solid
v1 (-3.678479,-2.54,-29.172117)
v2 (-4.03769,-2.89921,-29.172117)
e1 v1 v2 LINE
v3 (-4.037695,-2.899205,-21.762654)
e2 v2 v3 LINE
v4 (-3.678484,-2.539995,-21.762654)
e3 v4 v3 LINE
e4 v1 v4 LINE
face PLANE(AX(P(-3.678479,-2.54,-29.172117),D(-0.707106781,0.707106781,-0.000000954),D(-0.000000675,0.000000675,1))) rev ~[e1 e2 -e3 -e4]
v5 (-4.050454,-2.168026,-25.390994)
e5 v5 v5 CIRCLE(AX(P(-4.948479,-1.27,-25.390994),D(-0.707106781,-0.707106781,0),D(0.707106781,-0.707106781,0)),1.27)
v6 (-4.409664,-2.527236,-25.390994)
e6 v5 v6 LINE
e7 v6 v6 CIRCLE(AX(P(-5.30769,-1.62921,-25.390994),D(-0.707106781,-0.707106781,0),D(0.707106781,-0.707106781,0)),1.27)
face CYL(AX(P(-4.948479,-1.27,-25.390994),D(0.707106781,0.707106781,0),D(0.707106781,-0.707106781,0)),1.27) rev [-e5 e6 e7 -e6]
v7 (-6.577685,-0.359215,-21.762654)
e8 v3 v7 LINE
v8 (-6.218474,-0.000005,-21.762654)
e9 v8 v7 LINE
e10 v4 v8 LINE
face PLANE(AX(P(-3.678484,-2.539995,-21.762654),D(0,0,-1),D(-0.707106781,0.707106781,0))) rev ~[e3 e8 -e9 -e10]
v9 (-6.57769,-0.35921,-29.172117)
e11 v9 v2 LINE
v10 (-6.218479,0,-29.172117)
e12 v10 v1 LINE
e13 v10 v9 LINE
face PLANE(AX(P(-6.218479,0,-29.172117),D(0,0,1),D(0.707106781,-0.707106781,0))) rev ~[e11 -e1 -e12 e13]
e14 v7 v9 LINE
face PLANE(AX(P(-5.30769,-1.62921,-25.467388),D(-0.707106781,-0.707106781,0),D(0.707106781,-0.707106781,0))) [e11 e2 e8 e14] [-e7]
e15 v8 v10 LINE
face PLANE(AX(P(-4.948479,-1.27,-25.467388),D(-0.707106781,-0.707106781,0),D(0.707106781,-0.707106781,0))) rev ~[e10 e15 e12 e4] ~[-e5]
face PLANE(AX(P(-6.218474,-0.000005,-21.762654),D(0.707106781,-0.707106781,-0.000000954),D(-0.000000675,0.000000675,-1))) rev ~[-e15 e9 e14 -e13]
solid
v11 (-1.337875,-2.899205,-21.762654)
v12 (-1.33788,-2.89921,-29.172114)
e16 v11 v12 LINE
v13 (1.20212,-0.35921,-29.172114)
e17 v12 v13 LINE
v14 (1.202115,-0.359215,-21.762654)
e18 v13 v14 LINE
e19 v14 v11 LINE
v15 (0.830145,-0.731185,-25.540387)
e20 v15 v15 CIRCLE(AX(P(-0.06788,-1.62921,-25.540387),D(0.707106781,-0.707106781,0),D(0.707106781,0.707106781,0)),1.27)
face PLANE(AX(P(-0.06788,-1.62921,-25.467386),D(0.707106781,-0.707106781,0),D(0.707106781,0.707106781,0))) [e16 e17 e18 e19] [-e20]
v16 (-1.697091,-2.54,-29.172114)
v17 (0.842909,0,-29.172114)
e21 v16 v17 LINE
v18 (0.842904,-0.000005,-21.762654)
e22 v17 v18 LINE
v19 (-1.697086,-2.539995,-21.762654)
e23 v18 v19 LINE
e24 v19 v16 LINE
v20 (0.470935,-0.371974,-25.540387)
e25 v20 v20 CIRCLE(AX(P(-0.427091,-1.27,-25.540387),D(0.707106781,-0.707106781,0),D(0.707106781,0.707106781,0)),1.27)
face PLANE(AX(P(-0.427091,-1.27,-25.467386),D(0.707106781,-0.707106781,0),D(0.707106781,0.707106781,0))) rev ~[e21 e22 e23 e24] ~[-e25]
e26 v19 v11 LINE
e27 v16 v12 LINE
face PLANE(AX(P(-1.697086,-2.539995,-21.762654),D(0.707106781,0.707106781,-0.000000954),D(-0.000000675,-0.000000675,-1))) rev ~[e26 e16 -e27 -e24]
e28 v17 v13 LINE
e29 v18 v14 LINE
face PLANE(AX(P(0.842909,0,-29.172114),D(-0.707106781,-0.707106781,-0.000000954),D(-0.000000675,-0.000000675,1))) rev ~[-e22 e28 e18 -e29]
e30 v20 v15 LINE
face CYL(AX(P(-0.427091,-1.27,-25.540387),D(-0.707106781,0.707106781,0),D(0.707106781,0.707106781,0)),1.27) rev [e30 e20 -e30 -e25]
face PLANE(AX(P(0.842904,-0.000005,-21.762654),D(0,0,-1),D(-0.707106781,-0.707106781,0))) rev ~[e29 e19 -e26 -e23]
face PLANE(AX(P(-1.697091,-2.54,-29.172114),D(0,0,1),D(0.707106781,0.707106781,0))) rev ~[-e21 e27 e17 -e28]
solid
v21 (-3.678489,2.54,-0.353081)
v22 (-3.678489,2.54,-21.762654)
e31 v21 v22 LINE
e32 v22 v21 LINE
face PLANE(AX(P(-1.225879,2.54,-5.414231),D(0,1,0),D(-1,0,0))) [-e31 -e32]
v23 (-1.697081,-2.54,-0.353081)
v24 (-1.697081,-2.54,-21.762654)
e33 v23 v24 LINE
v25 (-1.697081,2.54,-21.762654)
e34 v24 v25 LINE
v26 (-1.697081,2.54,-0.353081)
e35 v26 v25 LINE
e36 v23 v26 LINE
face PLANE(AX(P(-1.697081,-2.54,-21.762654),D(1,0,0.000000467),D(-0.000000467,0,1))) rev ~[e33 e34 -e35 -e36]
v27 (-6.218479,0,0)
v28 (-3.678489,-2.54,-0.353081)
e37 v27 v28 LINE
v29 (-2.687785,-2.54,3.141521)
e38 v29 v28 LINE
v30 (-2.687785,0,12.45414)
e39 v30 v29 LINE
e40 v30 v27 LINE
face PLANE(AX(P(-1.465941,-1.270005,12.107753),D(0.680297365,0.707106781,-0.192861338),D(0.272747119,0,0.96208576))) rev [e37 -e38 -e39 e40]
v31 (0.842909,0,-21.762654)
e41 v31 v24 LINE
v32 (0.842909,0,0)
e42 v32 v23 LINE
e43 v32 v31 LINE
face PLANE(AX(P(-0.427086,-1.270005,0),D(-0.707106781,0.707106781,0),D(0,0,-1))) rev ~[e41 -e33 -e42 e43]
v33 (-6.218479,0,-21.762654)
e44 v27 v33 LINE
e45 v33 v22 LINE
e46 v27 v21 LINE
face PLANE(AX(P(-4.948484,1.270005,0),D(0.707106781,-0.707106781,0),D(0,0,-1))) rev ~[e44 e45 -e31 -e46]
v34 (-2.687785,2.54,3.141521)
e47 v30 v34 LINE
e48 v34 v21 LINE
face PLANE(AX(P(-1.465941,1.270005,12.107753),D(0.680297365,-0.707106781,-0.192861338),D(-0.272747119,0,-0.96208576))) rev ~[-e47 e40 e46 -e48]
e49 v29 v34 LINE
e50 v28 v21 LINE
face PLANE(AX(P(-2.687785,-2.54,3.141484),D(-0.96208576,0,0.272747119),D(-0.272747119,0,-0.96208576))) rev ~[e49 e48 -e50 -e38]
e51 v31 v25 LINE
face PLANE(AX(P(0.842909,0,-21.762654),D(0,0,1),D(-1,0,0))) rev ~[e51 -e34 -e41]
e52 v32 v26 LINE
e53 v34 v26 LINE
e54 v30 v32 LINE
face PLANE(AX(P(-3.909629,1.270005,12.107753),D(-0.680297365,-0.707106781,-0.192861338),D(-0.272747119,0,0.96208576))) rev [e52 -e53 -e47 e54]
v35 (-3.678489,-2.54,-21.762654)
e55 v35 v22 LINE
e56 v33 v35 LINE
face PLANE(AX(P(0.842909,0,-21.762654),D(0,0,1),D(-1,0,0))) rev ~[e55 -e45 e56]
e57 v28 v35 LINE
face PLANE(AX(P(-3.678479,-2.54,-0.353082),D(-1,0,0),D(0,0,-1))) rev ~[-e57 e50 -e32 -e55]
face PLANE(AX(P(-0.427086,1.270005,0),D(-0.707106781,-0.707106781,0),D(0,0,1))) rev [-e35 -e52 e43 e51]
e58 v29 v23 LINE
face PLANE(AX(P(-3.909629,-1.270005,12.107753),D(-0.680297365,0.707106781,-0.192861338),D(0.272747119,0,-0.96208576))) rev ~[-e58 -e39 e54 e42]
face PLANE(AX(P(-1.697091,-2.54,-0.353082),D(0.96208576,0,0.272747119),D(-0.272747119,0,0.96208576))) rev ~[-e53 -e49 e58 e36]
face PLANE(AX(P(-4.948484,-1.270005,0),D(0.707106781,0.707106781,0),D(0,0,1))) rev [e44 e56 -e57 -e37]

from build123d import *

# Parameters (mm, degrees)
F1_DEPTH  = 2.54
F2_SIZE   = 2.53999
F7_DEPTH  = 22.86
F8_R      = 1.27
F9_DEPTH  = 0.508
F6_R      = 1.27
F10_DEPTH = 0.508


# Not quite as in the source:
# - a fillet or chamfer is up to 0.001 mm smaller than in the source, because OpenCascade refuses the exact size
# - ends of sketch curves that miss each other by under 0.0002 mm in the source are joined


with BuildPart() as f1:
    # F0 (on Front) → F1 (new body)
    with BuildSketch(Plane.XZ):
        Polygon((-2.687785076, 12.45414), (-6.2184794806, 0), (-6.2184794806, -21.7626541853), (-2.687785076, -21.7626541853), align=None)
    extrude(amount=F1_DEPTH)

    # F2 (size 2.54 in the source; OpenCascade refuses exactly that, so slightly less here)
    f2_edges = [f1.edges().sort_by_distance(p)[0] for p in [
        (-6.218479, -2.54, -10.881327),
        (-4.453132, -2.54, 6.22707),
    ]]
    chamfer(f2_edges, length=F2_SIZE)

    # F3: F1 across face


with BuildPart() as f1_1:
    add(f1.part)
    add(f1.part.mirror(Plane(origin=(-4.3222158923, 0, -7.5368954457), x_dir=(1, 0, 0), z_dir=(0, 1, 0))))

    # F4: F1 across face


with BuildPart() as f1_2:
    add(f1_1.part)
    add(f1_1.part.mirror(Plane(origin=(-2.687785076, 0, -6.8601697168), x_dir=(0, 1, 0), z_dir=(1, 0, 0))))

    # F5 (on face) → F7 (cut)
    with BuildSketch(Plane.XZ.offset(2.54)):
        Polygon((-1.6970906714, -0.3530822644), (-2.687785076, 3.1414843557), (-3.6784794806, -0.3530822644), (-3.6784794806, -21.7626541853), (-1.6970806714, -21.7626541853), align=None)
    extrude(amount=-F7_DEPTH, mode=Mode.SUBTRACT)


with BuildPart() as f9:
    # F8 (on face) → F9 (new body)
    with BuildSketch(Plane(origin=(-3.1092397403, -3.1092397403, 0), x_dir=(0.7071067812, -0.7071067812, 0), z_dir=(-0.7071067812, -0.7071067812, 0))):
        Polygon((-0.805033632, -21.7626541853), (-4.3971219383, -21.7626541853), (-4.3971290094, -29.1721168905), (-0.805026561, -29.1721168905), align=None)
        with Locations((-2.6010777852, -25.3909938037)):
            Circle(F8_R, mode=Mode.SUBTRACT)
    extrude(amount=F9_DEPTH)


with BuildPart() as f10:
    # F6 (on face) → F10 (new body)
    with BuildSketch(Plane(origin=(0.4214546643, -0.4214546643, 0), x_dir=(0.7071067812, 0.7071067812, 0), z_dir=(0.7071067812, -0.7071067812, 0))):
        Polygon((0.5960198311, -21.7626541853), (-2.9960684752, -21.7626541853), (-2.9960755462, -29.1721135853), (0.5960269022, -29.1721135853), align=None)
        with Locations((-1.200024322, -25.5403872579)):
            Circle(F6_R, mode=Mode.SUBTRACT)
    extrude(amount=F10_DEPTH)


solid = Compound([f1_2.part, f9.part, f10.part])
